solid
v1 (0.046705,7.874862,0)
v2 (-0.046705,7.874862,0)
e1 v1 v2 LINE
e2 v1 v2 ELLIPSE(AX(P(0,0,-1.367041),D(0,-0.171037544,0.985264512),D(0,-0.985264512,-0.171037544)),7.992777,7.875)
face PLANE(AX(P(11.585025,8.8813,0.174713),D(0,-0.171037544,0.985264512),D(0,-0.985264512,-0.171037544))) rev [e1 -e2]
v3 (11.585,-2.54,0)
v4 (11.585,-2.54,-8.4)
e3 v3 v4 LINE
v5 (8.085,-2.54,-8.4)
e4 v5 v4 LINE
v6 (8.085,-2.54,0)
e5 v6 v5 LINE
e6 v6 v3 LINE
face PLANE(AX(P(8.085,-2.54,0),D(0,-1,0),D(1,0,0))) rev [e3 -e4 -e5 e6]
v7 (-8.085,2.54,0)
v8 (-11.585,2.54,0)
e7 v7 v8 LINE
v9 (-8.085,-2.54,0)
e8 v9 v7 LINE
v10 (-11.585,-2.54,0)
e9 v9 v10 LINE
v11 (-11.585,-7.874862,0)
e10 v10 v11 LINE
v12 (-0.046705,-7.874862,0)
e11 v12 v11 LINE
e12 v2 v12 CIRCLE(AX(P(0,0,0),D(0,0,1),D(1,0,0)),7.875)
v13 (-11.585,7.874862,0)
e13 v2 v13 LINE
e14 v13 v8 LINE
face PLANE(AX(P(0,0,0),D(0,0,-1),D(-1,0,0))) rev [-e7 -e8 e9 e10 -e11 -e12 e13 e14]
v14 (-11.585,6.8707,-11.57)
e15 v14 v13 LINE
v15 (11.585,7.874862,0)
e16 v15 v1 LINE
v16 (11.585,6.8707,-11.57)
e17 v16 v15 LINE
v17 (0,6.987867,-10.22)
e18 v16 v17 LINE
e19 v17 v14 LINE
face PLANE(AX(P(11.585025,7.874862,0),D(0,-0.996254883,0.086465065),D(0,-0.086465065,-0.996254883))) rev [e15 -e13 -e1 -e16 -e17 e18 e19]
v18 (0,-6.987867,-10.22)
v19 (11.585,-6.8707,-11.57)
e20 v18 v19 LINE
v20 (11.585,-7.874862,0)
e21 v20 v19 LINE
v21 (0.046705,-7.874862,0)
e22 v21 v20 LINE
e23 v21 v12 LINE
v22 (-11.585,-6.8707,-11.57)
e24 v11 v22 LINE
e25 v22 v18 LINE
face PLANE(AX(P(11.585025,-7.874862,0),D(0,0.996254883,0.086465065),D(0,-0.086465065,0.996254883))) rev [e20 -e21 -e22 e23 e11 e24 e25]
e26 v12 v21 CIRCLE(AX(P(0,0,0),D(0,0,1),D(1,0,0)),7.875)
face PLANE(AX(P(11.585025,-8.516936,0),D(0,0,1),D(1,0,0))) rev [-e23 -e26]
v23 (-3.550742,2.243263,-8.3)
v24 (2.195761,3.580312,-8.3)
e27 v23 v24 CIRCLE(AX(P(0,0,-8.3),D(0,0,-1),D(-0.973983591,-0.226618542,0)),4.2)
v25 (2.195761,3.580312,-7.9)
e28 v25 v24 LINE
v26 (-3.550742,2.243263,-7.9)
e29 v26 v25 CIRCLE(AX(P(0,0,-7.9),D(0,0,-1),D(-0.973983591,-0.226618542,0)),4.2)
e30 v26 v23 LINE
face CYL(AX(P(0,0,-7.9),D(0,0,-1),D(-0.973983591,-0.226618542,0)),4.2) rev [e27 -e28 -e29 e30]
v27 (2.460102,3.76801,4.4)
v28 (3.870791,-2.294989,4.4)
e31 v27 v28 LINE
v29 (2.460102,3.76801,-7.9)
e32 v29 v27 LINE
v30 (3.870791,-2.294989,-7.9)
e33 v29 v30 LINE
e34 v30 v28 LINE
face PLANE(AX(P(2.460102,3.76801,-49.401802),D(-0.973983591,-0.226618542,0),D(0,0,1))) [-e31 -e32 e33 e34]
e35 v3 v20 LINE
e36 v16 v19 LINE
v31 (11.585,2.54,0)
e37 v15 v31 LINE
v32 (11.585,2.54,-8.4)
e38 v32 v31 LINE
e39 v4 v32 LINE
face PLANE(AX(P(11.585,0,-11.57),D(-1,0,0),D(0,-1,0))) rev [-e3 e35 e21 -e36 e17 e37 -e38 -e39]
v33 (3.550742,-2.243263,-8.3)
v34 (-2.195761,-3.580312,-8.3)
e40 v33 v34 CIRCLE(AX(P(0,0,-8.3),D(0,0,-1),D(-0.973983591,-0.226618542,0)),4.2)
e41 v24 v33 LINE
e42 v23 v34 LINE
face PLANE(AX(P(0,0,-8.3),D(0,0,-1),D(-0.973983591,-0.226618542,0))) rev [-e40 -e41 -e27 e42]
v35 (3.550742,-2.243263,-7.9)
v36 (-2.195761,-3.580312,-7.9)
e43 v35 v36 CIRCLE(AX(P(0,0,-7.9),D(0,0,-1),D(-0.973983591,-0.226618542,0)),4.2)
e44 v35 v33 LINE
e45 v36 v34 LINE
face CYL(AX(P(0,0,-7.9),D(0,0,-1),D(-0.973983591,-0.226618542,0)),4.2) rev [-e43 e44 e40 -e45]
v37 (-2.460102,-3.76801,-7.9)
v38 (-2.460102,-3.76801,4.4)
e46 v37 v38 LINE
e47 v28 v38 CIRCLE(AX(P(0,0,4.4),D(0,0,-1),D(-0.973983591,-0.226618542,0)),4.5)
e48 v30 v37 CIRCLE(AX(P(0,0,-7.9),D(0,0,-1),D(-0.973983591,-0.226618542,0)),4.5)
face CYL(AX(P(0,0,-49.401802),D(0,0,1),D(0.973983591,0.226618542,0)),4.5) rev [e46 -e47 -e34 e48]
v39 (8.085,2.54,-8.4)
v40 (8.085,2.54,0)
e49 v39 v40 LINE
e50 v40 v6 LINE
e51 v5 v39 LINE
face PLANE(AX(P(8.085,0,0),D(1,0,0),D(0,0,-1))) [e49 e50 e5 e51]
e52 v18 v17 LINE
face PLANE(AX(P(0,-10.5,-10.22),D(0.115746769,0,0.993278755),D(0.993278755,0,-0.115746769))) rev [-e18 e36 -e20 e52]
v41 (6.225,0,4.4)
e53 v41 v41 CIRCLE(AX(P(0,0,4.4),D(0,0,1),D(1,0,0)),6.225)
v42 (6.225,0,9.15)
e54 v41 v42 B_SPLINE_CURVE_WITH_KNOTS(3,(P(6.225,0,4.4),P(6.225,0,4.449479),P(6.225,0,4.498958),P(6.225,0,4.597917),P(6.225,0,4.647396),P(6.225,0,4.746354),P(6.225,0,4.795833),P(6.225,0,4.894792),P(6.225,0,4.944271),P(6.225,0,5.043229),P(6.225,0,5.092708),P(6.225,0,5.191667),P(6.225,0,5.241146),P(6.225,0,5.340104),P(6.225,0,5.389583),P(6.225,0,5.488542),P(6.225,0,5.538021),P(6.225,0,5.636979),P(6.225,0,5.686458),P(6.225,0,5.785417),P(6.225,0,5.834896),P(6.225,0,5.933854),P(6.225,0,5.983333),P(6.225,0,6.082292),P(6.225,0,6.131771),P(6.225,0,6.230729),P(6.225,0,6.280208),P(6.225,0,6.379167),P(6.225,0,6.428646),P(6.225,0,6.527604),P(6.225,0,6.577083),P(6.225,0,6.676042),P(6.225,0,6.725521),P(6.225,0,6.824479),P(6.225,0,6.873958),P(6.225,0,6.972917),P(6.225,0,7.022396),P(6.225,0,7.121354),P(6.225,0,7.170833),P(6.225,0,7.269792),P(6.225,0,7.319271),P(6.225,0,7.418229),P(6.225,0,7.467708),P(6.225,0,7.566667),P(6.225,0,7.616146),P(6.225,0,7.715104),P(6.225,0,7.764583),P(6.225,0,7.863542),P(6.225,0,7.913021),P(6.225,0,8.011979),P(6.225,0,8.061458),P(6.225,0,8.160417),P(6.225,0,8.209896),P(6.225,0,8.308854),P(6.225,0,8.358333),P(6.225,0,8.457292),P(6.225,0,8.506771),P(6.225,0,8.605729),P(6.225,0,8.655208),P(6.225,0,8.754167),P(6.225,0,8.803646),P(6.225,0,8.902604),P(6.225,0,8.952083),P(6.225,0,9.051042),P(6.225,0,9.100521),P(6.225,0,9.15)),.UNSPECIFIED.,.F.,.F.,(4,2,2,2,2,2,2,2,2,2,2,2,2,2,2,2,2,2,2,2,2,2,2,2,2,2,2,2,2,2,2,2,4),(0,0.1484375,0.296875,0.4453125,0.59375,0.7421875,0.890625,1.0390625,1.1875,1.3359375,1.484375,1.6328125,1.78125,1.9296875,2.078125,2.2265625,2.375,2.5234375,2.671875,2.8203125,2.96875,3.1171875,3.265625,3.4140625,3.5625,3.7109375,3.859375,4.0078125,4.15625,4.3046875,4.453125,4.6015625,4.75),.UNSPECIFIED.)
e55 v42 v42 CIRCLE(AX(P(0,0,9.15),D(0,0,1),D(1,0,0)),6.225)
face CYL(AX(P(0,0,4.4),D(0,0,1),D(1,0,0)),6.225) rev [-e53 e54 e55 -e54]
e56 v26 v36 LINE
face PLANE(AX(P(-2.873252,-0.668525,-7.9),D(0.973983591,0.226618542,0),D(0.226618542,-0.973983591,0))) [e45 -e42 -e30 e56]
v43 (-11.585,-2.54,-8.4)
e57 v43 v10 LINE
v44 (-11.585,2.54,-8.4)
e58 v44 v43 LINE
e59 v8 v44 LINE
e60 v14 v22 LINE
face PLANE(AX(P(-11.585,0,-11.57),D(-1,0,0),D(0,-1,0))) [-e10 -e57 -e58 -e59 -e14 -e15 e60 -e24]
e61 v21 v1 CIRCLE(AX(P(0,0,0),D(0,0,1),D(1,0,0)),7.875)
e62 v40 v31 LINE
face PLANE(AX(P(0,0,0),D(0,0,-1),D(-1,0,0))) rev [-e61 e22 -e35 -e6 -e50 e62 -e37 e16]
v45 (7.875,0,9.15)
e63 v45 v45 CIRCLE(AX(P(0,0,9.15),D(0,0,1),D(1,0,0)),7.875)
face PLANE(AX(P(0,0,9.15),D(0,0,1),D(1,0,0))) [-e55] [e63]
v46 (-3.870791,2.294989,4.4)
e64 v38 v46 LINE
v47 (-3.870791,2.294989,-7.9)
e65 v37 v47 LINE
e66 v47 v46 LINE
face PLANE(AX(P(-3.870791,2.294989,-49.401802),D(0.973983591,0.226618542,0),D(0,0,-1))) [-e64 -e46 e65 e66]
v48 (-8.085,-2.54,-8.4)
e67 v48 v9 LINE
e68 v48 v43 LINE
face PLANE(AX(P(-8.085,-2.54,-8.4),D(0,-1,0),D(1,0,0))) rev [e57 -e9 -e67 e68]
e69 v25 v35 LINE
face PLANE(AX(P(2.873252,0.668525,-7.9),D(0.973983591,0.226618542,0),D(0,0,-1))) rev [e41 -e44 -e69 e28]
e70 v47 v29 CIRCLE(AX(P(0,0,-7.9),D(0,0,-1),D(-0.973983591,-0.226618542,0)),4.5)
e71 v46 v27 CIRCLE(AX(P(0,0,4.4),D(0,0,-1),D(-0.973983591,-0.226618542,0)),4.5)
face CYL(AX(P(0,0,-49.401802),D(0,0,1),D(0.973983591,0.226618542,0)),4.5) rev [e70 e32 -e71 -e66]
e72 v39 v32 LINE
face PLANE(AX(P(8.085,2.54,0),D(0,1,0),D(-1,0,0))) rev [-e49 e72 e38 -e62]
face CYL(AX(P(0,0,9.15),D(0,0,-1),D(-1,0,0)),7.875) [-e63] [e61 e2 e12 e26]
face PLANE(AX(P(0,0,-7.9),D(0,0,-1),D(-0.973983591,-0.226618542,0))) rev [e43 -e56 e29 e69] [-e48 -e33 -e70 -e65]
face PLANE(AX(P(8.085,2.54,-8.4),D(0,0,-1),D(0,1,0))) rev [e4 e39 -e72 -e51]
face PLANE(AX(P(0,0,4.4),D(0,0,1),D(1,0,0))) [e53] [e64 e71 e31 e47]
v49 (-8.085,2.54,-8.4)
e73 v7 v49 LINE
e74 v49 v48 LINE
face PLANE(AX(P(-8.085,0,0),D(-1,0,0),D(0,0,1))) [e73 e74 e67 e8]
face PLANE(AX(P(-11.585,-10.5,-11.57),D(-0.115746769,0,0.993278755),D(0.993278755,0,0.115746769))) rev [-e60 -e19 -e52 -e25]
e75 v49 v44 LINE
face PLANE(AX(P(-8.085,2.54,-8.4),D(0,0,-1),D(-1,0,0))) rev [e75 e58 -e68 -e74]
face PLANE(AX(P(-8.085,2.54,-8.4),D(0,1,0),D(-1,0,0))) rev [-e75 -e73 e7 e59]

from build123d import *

# Parameters (mm, degrees)
SKETCH1_R           = 7.875
BOSS_EXTRUDE1_DEPTH = 9.15
BOSS_EXTRUDE4_DEPTH = 11.57
SKETCH12_W          = 8.4
SKETCH12_H          = 5.08
CUT_EXTRUDE36_DEPTH = 3.5
SKETCH13_W          = 8.4
SKETCH13_H          = 5.08
CUT_EXTRUDE37_DEPTH = 3.5
SKETCH14_R          = 6.225
CUT_EXTRUDE38_DEPTH = 4.75
CAVITY1_START       = -7.9
CAVITY1_DEPTH       = 12.3
CAVITY1_START_2     = -8.3
CAVITY1_2_DEPTH     = 0.4
CUT_EXTRUDE40_START = -12.7
CUT_EXTRUDE40_DEPTH = 12.7
CUT_EXTRUDE45_DEPTH = 28.068975322
CUT_EXTRUDE46_DEPTH = 10.5


# Read off the part's stored shape, not the designer's step: Cavity1
with BuildPart() as part:
    # Sketch1 → Boss-Extrude1 (new body)
    with BuildSketch(Plane.XY):
        Circle(SKETCH1_R)
    extrude(amount=BOSS_EXTRUDE1_DEPTH)

    # Sketch2 → Boss-Extrude4 (add)
    with BuildSketch(Plane(origin=(0, 0, 0), x_dir=(-1, 0, 0), z_dir=(0, 0, -1))):
        Polygon((-11.585, 7.874861502), (-11.585, -7.874861502), (0, -7.875), (11.585, -7.874861502), (11.585, 7.874861502), (-9.4146e-05, 7.874999999), align=None)
    extrude(amount=BOSS_EXTRUDE4_DEPTH)

    # Sketch12 → Cut-Extrude36 (cut)
    with BuildSketch(Plane.ZY.offset(11.585)):
        with Locations((-4.2, 0)):
            Rectangle(SKETCH12_W, SKETCH12_H)
    extrude(amount=-CUT_EXTRUDE36_DEPTH, mode=Mode.SUBTRACT)

    # Sketch13 → Cut-Extrude37 (cut)
    with BuildSketch(Plane(origin=(11.585, 0, 0), x_dir=(0, 0, -1), z_dir=(1, 0, 0))):
        with Locations((4.2, 0)):
            Rectangle(SKETCH13_W, SKETCH13_H)
    extrude(amount=-CUT_EXTRUDE37_DEPTH, mode=Mode.SUBTRACT)

    # Sketch14 → Cut-Extrude38 (cut)
    with BuildSketch(Plane.XY.offset(9.15)):
        Circle(SKETCH14_R)
    extrude(amount=-CUT_EXTRUDE38_DEPTH, mode=Mode.SUBTRACT)

    # Cavity1 outline → Cavity1 (cut)
    with BuildSketch(Plane.XY.offset(CAVITY1_START)):
        with BuildLine():
            Line((3.870791195, -2.29498922), (2.460102149, 3.768009742))
            ThreePointArc((2.460102149, 3.768009742), (-1.019783438, 4.382926162), (-3.870791195, 2.29498922))
            Line((-3.870791195, 2.29498922), (-2.460102149, -3.768009742))
            ThreePointArc((-2.460102149, -3.768009742), (1.019783438, -4.382926162), (3.870791195, -2.29498922))
        make_face()
        Polygon((0.567084274, 3.078606085), (1.867874704, -2.51205973), (-0.567084274, -3.078606085), (-1.867874704, 2.51205973), align=None, mode=Mode.SUBTRACT)
    extrude(amount=CAVITY1_DEPTH, mode=Mode.SUBTRACT)

    # Cavity1 2 outline → Cavity1 2 (cut)
    with BuildSketch(Plane.XY.offset(CAVITY1_START_2)):
        with BuildLine():
            ThreePointArc((2.195760692, 3.580312135), (-0.951797876, 4.090731084), (-3.550742498, 2.243262738))
            Line((-3.550742498, 2.243262738), (-2.195760692, -3.580312135))
            ThreePointArc((-2.195760692, -3.580312135), (0.951797876, -4.090731084), (3.550742498, -2.243262738))
            Line((3.550742498, -2.243262738), (2.195760692, 3.580312135))
        make_face()
        Polygon((0.567084274, 3.078606085), (1.867874704, -2.51205973), (-0.567084274, -3.078606085), (-1.867874704, 2.51205973), align=None, mode=Mode.SUBTRACT)
    extrude(amount=CAVITY1_2_DEPTH, mode=Mode.SUBTRACT)

    # Sketch15 → Cut-Extrude40 (cut)
    with BuildSketch(Plane.XY.offset(4.4).offset(CUT_EXTRUDE40_START)):
        Polygon((-1.867874704, 2.51205973), (0.567084274, 3.078606085), (1.867874704, -2.51205973), (-0.567084274, -3.078606085), align=None)
    extrude(amount=CUT_EXTRUDE40_DEPTH, mode=Mode.SUBTRACT)

    # Sketch16 → Cut-Extrude45 (cut, through all)
    with BuildSketch(Plane.ZY.offset(11.585)):
        Polygon((0, 7.874861502), (-11.57, 6.8707), (-11.57, 7.874861502), (-11.57, 8.881300341), (0.174713313, 8.881300341), align=None)
        Polygon((0, -7.874861502), (-11.57, -6.8707), (-11.57, -8.73716659), (0, -8.516935753), align=None)
    extrude(amount=-CUT_EXTRUDE45_DEPTH, mode=Mode.SUBTRACT)

    # Sketch17 → Cut-Extrude46 (cut, symmetric)
    with BuildSketch(Plane(origin=(0, 0, 0), x_dir=(1, 0, 0), z_dir=(0, 1, 0))):
        Polygon((-11.585, 11.57), (11.585, 11.57), (0, 10.22), align=None)
    extrude(amount=CUT_EXTRUDE46_DEPTH, both=True, mode=Mode.SUBTRACT)


solid = part.part
